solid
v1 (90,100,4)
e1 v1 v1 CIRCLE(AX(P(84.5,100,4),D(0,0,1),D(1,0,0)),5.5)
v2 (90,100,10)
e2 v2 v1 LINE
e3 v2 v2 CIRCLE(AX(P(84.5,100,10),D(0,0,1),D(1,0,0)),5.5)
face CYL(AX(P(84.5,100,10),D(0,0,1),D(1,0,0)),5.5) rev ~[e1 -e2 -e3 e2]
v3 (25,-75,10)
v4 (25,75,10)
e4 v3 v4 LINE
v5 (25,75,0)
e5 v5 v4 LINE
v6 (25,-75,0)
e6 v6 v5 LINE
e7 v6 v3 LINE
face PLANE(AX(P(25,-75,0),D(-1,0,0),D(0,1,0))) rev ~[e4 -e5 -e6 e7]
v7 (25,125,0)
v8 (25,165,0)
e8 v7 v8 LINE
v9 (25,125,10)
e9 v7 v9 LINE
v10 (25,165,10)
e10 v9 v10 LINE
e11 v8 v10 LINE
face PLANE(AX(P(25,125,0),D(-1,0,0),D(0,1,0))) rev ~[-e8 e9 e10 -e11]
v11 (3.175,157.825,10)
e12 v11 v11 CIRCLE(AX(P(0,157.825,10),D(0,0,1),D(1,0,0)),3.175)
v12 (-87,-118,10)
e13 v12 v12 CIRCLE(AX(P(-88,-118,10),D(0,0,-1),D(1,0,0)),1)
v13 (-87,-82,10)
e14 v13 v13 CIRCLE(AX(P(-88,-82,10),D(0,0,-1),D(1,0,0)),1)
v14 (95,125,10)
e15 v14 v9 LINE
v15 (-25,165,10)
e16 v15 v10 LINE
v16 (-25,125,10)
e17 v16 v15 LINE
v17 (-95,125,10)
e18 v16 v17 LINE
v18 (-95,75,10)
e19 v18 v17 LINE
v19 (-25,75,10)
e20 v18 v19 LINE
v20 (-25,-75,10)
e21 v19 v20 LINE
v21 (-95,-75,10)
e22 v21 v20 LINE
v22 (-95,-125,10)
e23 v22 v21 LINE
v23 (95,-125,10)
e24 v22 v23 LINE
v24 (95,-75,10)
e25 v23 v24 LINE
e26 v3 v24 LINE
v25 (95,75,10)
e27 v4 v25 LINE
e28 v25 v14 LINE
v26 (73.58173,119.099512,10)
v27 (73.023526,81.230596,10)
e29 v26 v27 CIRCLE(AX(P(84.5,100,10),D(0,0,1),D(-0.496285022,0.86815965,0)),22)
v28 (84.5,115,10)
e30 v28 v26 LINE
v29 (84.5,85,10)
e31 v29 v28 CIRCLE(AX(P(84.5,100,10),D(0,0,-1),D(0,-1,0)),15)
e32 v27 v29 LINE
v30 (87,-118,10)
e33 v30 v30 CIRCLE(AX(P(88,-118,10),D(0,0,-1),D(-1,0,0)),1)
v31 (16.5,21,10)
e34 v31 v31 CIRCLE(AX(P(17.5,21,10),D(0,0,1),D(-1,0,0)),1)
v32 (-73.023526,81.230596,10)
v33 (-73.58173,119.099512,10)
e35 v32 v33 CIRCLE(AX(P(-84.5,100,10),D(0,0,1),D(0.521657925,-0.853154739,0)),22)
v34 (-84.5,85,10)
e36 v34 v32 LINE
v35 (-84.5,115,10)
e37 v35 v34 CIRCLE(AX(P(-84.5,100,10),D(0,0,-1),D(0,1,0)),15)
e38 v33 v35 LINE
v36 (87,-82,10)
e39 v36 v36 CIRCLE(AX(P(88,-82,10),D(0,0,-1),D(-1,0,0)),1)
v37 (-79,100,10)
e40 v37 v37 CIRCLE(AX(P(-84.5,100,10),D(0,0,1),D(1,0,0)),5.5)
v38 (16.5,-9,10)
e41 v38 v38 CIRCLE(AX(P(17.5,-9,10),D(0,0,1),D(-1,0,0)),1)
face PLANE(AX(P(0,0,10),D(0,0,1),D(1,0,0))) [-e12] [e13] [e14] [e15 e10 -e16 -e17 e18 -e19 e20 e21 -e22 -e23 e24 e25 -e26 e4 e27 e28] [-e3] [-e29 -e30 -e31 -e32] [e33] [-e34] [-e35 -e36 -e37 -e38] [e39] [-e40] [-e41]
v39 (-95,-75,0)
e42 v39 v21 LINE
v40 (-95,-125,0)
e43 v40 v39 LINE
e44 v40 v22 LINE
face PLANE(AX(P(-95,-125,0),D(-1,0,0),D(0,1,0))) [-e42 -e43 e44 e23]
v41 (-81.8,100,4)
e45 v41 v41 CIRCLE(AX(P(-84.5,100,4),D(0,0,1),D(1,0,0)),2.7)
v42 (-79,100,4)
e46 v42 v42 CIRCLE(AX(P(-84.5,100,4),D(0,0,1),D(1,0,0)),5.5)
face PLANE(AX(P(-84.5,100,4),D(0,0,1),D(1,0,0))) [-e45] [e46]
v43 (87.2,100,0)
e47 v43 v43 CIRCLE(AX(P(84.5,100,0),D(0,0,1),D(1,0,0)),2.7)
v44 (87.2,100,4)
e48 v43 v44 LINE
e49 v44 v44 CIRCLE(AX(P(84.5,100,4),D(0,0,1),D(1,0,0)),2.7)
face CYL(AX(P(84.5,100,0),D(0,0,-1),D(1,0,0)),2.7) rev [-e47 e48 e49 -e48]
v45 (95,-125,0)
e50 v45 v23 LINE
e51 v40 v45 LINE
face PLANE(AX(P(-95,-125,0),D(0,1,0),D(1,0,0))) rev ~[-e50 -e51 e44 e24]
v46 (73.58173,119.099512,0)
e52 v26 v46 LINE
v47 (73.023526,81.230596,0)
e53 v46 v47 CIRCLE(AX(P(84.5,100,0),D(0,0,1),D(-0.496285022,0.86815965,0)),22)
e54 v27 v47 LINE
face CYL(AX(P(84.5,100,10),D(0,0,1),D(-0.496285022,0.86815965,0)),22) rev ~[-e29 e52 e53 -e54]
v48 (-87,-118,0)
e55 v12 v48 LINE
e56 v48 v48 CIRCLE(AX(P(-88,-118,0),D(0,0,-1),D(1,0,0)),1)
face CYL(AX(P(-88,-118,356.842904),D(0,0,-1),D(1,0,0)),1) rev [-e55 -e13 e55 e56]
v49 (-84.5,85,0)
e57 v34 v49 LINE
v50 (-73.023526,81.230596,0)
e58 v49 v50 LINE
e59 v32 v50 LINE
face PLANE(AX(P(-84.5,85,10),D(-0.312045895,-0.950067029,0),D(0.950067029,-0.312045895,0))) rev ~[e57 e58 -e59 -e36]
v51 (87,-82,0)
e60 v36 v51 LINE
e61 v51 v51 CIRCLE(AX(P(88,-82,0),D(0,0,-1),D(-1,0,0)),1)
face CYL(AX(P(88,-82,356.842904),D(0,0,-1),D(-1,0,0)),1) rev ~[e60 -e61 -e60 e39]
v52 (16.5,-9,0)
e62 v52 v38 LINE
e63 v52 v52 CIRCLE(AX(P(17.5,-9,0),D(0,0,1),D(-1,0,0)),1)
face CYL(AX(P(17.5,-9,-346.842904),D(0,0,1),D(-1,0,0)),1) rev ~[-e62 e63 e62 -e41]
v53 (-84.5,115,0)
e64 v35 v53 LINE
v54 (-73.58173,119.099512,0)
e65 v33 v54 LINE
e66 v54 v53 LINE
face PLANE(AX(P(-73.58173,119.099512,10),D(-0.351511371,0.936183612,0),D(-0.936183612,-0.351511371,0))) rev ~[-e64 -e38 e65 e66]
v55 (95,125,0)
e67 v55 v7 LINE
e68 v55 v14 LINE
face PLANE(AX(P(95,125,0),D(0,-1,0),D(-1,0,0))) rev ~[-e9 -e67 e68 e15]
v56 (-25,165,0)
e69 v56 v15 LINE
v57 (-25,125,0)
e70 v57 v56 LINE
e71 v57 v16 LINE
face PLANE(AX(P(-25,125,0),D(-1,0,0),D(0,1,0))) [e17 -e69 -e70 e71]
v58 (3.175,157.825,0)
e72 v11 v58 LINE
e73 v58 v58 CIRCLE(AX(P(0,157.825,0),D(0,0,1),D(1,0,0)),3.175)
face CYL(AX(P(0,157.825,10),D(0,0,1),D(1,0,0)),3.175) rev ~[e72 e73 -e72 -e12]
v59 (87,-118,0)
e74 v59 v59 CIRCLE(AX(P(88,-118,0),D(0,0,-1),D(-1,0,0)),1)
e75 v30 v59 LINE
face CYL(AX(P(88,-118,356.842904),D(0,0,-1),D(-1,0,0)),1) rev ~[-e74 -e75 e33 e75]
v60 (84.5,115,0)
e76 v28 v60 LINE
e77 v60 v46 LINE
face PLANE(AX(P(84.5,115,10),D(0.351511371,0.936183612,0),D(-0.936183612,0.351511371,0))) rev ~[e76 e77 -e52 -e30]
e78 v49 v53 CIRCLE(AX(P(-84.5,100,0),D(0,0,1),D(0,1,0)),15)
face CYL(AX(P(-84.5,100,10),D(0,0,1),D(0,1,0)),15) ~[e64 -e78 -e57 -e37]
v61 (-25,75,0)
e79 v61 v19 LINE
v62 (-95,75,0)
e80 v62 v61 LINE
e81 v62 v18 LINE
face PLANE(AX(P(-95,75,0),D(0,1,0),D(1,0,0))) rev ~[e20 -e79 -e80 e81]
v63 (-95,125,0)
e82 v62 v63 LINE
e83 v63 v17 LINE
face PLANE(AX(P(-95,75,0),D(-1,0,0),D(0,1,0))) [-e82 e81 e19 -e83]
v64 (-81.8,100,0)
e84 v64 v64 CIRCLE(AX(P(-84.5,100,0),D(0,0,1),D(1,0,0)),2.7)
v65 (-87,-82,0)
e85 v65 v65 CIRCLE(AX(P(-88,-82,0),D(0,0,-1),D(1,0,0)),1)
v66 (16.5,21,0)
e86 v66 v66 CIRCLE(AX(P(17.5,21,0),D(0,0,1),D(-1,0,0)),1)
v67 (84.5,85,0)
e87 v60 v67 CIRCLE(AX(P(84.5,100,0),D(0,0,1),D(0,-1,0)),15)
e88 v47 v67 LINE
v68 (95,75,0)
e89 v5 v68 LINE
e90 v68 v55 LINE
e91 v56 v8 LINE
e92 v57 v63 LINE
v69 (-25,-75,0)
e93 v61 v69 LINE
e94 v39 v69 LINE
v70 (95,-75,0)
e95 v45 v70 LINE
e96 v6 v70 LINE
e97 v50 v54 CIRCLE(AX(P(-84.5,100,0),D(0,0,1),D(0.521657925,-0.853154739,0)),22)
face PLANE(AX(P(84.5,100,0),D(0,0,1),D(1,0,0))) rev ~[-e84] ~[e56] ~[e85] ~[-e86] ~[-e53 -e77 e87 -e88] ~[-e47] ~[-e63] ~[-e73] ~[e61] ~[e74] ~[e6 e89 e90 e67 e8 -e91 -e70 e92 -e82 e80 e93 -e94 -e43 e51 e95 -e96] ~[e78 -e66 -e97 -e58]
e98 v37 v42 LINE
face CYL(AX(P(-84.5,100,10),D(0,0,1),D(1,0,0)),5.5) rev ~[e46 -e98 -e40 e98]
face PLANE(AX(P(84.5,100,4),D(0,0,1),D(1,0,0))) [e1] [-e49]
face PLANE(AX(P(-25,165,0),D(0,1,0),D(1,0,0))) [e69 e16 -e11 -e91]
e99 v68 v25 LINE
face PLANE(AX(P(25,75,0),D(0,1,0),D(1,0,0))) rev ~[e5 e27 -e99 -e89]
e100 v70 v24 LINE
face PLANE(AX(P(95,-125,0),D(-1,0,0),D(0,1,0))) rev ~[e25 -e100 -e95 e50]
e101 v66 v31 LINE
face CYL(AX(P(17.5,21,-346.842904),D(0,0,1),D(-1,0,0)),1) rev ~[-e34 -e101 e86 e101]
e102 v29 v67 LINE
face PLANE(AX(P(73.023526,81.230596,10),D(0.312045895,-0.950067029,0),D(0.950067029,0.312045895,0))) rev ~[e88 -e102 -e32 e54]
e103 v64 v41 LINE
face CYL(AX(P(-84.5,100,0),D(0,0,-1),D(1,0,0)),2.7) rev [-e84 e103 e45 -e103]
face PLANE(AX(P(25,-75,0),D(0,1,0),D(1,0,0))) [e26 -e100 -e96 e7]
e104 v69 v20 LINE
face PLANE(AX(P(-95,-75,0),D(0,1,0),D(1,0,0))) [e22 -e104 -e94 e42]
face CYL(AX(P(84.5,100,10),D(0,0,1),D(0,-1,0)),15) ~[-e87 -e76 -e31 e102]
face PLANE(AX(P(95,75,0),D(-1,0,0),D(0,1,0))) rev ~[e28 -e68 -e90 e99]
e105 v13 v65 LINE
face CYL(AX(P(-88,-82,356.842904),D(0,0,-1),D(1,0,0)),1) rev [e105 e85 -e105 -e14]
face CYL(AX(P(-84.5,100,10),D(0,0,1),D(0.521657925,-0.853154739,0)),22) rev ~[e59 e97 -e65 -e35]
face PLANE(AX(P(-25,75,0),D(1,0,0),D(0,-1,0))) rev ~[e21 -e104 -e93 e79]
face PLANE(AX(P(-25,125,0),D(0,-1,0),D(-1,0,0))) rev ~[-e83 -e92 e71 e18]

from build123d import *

# Parameters (mm, degrees)
F0_W      = 50
F0_H      = 150
F0_H_2    = 50
F0_W_2    = 70
F0_H_3    = 40
F1_DEPTH  = 10
F2_R      = 3.175
F3_DEPTH  = 10.001
F4_R      = 5.5
F5_DEPTH  = 10.001
F6_R      = 5.5
F7_DEPTH  = 10.001
F9_DEPTH  = 10.001
F11_D     = 2
F13_D     = 2
F14_R     = 5.5
F14_R_2   = 2.7
F15_DEPTH = 4
F16_DEPTH = 4


# Not quite as in the source:
# - a pattern or mirror of a feature is missing from the dataset's text; its kind, count and spacing are read off the source's solid
# - a feature names something its author has since deleted; it is built from what else it names


with BuildPart() as f1:
    # F0 (on Top) → F1 (new body)
    with BuildSketch(Plane.XY):
        Rectangle(F0_W, F0_H)
        with Locations((0, 100)):
            Rectangle(F0_W, F0_H_2)
        with Locations((60, 100)):
            Rectangle(F0_W_2, F0_H_2)
        with Locations((-60, 100)):
            Rectangle(F0_W_2, F0_H_2)
        with Locations((0, -100)):
            Rectangle(F0_W, F0_H_2)
        with Locations((60, -100)):
            Rectangle(F0_W_2, F0_H_2)
        with Locations((0, 145)):
            Rectangle(F0_W, F0_H_3)
        with Locations((-60, -100)):
            Rectangle(F0_W_2, F0_H_2)
    extrude(amount=F1_DEPTH)

    # F2 (on face) → F3 (cut, through all)
    with BuildSketch(Plane.XY.offset(10)):
        with Locations((0, 157.825)):
            Circle(F2_R)
    extrude(amount=-F3_DEPTH, mode=Mode.SUBTRACT)

    # F4 (on face) → F5 (cut, through all)
    with BuildSketch(Plane.XY.offset(10)):
        with Locations((-84.5, 100)):
            Circle(F4_R)
    extrude(amount=-F5_DEPTH, mode=Mode.SUBTRACT)

    # F6 (on face) → F7 (cut, through all)
    with BuildSketch(Plane.XY.offset(10)):
        with Locations((84.5, 100)):
            Circle(F6_R)
    extrude(amount=-F7_DEPTH, mode=Mode.SUBTRACT)

    # F8 (on face) → F9 (cut, through all)
    with BuildSketch(Plane.XY.offset(10)):
        with BuildLine():
            Line((73.023525645, 81.2305957373), (84.5, 85))
            ThreePointArc((84.5, 85), (69.5, 100), (84.5, 115))
            Line((84.5, 115), (73.5817295179, 119.0995122891))
            ThreePointArc((73.5817295179, 119.0995122891), (62.5023896916, 100.3242540951), (73.023525645, 81.2305957373))
        make_face()
        with BuildLine():
            Line((-84.5, 85), (-73.023525645, 81.2305957373))
            ThreePointArc((-73.023525645, 81.2305957373), (-62.5023896916, 100.3242540951), (-73.5817295179, 119.0995122891))
            Line((-73.5817295179, 119.0995122891), (-84.5, 115))
            ThreePointArc((-84.5, 115), (-69.5, 100), (-84.5, 85))
        make_face()
    extrude(amount=-F9_DEPTH, mode=Mode.SUBTRACT)

    # F11 (through all)
    with Locations(Plane.XY.offset(10)):
        with Locations((88, -82), (88, -118)):
            f11 = Hole(F11_D / 2)

    # F11_copies: F11 across plane
    add(f11.mirror(Plane(origin=(0, 0, 0), x_dir=(0, 0, -1), z_dir=(-1, 0, 0))), mode=Mode.SUBTRACT)

    # F13 (through all)
    with Locations(Plane(origin=(0, 0, 0), x_dir=(1, 0, 0), z_dir=(0, 0, -1))):
        with Locations((17.5, -21), (17.5, 9)):
            Hole(F13_D / 2)

    # F14 (on Top) → F15 (join)
    with BuildSketch(Plane.XY):
        with Locations((84.5, 100)):
            Circle(F14_R)
        with Locations((84.5, 100)):
            Circle(F14_R_2, mode=Mode.SUBTRACT)
        with Locations((-84.5, 100)):
            Circle(F14_R)
        with Locations((-84.5, 100)):
            Circle(F14_R_2, mode=Mode.SUBTRACT)
    extrude(amount=F15_DEPTH)

    # F14 (on Top) → F16 (join)
    with BuildSketch(Plane.XY):
        with Locations((84.5, 100)):
            Circle(F14_R)
        with Locations((84.5, 100)):
            Circle(F14_R_2, mode=Mode.SUBTRACT)
        with Locations((-84.5, 100)):
            Circle(F14_R)
        with Locations((-84.5, 100)):
            Circle(F14_R_2, mode=Mode.SUBTRACT)
    extrude(amount=F16_DEPTH)


solid = f1.part
